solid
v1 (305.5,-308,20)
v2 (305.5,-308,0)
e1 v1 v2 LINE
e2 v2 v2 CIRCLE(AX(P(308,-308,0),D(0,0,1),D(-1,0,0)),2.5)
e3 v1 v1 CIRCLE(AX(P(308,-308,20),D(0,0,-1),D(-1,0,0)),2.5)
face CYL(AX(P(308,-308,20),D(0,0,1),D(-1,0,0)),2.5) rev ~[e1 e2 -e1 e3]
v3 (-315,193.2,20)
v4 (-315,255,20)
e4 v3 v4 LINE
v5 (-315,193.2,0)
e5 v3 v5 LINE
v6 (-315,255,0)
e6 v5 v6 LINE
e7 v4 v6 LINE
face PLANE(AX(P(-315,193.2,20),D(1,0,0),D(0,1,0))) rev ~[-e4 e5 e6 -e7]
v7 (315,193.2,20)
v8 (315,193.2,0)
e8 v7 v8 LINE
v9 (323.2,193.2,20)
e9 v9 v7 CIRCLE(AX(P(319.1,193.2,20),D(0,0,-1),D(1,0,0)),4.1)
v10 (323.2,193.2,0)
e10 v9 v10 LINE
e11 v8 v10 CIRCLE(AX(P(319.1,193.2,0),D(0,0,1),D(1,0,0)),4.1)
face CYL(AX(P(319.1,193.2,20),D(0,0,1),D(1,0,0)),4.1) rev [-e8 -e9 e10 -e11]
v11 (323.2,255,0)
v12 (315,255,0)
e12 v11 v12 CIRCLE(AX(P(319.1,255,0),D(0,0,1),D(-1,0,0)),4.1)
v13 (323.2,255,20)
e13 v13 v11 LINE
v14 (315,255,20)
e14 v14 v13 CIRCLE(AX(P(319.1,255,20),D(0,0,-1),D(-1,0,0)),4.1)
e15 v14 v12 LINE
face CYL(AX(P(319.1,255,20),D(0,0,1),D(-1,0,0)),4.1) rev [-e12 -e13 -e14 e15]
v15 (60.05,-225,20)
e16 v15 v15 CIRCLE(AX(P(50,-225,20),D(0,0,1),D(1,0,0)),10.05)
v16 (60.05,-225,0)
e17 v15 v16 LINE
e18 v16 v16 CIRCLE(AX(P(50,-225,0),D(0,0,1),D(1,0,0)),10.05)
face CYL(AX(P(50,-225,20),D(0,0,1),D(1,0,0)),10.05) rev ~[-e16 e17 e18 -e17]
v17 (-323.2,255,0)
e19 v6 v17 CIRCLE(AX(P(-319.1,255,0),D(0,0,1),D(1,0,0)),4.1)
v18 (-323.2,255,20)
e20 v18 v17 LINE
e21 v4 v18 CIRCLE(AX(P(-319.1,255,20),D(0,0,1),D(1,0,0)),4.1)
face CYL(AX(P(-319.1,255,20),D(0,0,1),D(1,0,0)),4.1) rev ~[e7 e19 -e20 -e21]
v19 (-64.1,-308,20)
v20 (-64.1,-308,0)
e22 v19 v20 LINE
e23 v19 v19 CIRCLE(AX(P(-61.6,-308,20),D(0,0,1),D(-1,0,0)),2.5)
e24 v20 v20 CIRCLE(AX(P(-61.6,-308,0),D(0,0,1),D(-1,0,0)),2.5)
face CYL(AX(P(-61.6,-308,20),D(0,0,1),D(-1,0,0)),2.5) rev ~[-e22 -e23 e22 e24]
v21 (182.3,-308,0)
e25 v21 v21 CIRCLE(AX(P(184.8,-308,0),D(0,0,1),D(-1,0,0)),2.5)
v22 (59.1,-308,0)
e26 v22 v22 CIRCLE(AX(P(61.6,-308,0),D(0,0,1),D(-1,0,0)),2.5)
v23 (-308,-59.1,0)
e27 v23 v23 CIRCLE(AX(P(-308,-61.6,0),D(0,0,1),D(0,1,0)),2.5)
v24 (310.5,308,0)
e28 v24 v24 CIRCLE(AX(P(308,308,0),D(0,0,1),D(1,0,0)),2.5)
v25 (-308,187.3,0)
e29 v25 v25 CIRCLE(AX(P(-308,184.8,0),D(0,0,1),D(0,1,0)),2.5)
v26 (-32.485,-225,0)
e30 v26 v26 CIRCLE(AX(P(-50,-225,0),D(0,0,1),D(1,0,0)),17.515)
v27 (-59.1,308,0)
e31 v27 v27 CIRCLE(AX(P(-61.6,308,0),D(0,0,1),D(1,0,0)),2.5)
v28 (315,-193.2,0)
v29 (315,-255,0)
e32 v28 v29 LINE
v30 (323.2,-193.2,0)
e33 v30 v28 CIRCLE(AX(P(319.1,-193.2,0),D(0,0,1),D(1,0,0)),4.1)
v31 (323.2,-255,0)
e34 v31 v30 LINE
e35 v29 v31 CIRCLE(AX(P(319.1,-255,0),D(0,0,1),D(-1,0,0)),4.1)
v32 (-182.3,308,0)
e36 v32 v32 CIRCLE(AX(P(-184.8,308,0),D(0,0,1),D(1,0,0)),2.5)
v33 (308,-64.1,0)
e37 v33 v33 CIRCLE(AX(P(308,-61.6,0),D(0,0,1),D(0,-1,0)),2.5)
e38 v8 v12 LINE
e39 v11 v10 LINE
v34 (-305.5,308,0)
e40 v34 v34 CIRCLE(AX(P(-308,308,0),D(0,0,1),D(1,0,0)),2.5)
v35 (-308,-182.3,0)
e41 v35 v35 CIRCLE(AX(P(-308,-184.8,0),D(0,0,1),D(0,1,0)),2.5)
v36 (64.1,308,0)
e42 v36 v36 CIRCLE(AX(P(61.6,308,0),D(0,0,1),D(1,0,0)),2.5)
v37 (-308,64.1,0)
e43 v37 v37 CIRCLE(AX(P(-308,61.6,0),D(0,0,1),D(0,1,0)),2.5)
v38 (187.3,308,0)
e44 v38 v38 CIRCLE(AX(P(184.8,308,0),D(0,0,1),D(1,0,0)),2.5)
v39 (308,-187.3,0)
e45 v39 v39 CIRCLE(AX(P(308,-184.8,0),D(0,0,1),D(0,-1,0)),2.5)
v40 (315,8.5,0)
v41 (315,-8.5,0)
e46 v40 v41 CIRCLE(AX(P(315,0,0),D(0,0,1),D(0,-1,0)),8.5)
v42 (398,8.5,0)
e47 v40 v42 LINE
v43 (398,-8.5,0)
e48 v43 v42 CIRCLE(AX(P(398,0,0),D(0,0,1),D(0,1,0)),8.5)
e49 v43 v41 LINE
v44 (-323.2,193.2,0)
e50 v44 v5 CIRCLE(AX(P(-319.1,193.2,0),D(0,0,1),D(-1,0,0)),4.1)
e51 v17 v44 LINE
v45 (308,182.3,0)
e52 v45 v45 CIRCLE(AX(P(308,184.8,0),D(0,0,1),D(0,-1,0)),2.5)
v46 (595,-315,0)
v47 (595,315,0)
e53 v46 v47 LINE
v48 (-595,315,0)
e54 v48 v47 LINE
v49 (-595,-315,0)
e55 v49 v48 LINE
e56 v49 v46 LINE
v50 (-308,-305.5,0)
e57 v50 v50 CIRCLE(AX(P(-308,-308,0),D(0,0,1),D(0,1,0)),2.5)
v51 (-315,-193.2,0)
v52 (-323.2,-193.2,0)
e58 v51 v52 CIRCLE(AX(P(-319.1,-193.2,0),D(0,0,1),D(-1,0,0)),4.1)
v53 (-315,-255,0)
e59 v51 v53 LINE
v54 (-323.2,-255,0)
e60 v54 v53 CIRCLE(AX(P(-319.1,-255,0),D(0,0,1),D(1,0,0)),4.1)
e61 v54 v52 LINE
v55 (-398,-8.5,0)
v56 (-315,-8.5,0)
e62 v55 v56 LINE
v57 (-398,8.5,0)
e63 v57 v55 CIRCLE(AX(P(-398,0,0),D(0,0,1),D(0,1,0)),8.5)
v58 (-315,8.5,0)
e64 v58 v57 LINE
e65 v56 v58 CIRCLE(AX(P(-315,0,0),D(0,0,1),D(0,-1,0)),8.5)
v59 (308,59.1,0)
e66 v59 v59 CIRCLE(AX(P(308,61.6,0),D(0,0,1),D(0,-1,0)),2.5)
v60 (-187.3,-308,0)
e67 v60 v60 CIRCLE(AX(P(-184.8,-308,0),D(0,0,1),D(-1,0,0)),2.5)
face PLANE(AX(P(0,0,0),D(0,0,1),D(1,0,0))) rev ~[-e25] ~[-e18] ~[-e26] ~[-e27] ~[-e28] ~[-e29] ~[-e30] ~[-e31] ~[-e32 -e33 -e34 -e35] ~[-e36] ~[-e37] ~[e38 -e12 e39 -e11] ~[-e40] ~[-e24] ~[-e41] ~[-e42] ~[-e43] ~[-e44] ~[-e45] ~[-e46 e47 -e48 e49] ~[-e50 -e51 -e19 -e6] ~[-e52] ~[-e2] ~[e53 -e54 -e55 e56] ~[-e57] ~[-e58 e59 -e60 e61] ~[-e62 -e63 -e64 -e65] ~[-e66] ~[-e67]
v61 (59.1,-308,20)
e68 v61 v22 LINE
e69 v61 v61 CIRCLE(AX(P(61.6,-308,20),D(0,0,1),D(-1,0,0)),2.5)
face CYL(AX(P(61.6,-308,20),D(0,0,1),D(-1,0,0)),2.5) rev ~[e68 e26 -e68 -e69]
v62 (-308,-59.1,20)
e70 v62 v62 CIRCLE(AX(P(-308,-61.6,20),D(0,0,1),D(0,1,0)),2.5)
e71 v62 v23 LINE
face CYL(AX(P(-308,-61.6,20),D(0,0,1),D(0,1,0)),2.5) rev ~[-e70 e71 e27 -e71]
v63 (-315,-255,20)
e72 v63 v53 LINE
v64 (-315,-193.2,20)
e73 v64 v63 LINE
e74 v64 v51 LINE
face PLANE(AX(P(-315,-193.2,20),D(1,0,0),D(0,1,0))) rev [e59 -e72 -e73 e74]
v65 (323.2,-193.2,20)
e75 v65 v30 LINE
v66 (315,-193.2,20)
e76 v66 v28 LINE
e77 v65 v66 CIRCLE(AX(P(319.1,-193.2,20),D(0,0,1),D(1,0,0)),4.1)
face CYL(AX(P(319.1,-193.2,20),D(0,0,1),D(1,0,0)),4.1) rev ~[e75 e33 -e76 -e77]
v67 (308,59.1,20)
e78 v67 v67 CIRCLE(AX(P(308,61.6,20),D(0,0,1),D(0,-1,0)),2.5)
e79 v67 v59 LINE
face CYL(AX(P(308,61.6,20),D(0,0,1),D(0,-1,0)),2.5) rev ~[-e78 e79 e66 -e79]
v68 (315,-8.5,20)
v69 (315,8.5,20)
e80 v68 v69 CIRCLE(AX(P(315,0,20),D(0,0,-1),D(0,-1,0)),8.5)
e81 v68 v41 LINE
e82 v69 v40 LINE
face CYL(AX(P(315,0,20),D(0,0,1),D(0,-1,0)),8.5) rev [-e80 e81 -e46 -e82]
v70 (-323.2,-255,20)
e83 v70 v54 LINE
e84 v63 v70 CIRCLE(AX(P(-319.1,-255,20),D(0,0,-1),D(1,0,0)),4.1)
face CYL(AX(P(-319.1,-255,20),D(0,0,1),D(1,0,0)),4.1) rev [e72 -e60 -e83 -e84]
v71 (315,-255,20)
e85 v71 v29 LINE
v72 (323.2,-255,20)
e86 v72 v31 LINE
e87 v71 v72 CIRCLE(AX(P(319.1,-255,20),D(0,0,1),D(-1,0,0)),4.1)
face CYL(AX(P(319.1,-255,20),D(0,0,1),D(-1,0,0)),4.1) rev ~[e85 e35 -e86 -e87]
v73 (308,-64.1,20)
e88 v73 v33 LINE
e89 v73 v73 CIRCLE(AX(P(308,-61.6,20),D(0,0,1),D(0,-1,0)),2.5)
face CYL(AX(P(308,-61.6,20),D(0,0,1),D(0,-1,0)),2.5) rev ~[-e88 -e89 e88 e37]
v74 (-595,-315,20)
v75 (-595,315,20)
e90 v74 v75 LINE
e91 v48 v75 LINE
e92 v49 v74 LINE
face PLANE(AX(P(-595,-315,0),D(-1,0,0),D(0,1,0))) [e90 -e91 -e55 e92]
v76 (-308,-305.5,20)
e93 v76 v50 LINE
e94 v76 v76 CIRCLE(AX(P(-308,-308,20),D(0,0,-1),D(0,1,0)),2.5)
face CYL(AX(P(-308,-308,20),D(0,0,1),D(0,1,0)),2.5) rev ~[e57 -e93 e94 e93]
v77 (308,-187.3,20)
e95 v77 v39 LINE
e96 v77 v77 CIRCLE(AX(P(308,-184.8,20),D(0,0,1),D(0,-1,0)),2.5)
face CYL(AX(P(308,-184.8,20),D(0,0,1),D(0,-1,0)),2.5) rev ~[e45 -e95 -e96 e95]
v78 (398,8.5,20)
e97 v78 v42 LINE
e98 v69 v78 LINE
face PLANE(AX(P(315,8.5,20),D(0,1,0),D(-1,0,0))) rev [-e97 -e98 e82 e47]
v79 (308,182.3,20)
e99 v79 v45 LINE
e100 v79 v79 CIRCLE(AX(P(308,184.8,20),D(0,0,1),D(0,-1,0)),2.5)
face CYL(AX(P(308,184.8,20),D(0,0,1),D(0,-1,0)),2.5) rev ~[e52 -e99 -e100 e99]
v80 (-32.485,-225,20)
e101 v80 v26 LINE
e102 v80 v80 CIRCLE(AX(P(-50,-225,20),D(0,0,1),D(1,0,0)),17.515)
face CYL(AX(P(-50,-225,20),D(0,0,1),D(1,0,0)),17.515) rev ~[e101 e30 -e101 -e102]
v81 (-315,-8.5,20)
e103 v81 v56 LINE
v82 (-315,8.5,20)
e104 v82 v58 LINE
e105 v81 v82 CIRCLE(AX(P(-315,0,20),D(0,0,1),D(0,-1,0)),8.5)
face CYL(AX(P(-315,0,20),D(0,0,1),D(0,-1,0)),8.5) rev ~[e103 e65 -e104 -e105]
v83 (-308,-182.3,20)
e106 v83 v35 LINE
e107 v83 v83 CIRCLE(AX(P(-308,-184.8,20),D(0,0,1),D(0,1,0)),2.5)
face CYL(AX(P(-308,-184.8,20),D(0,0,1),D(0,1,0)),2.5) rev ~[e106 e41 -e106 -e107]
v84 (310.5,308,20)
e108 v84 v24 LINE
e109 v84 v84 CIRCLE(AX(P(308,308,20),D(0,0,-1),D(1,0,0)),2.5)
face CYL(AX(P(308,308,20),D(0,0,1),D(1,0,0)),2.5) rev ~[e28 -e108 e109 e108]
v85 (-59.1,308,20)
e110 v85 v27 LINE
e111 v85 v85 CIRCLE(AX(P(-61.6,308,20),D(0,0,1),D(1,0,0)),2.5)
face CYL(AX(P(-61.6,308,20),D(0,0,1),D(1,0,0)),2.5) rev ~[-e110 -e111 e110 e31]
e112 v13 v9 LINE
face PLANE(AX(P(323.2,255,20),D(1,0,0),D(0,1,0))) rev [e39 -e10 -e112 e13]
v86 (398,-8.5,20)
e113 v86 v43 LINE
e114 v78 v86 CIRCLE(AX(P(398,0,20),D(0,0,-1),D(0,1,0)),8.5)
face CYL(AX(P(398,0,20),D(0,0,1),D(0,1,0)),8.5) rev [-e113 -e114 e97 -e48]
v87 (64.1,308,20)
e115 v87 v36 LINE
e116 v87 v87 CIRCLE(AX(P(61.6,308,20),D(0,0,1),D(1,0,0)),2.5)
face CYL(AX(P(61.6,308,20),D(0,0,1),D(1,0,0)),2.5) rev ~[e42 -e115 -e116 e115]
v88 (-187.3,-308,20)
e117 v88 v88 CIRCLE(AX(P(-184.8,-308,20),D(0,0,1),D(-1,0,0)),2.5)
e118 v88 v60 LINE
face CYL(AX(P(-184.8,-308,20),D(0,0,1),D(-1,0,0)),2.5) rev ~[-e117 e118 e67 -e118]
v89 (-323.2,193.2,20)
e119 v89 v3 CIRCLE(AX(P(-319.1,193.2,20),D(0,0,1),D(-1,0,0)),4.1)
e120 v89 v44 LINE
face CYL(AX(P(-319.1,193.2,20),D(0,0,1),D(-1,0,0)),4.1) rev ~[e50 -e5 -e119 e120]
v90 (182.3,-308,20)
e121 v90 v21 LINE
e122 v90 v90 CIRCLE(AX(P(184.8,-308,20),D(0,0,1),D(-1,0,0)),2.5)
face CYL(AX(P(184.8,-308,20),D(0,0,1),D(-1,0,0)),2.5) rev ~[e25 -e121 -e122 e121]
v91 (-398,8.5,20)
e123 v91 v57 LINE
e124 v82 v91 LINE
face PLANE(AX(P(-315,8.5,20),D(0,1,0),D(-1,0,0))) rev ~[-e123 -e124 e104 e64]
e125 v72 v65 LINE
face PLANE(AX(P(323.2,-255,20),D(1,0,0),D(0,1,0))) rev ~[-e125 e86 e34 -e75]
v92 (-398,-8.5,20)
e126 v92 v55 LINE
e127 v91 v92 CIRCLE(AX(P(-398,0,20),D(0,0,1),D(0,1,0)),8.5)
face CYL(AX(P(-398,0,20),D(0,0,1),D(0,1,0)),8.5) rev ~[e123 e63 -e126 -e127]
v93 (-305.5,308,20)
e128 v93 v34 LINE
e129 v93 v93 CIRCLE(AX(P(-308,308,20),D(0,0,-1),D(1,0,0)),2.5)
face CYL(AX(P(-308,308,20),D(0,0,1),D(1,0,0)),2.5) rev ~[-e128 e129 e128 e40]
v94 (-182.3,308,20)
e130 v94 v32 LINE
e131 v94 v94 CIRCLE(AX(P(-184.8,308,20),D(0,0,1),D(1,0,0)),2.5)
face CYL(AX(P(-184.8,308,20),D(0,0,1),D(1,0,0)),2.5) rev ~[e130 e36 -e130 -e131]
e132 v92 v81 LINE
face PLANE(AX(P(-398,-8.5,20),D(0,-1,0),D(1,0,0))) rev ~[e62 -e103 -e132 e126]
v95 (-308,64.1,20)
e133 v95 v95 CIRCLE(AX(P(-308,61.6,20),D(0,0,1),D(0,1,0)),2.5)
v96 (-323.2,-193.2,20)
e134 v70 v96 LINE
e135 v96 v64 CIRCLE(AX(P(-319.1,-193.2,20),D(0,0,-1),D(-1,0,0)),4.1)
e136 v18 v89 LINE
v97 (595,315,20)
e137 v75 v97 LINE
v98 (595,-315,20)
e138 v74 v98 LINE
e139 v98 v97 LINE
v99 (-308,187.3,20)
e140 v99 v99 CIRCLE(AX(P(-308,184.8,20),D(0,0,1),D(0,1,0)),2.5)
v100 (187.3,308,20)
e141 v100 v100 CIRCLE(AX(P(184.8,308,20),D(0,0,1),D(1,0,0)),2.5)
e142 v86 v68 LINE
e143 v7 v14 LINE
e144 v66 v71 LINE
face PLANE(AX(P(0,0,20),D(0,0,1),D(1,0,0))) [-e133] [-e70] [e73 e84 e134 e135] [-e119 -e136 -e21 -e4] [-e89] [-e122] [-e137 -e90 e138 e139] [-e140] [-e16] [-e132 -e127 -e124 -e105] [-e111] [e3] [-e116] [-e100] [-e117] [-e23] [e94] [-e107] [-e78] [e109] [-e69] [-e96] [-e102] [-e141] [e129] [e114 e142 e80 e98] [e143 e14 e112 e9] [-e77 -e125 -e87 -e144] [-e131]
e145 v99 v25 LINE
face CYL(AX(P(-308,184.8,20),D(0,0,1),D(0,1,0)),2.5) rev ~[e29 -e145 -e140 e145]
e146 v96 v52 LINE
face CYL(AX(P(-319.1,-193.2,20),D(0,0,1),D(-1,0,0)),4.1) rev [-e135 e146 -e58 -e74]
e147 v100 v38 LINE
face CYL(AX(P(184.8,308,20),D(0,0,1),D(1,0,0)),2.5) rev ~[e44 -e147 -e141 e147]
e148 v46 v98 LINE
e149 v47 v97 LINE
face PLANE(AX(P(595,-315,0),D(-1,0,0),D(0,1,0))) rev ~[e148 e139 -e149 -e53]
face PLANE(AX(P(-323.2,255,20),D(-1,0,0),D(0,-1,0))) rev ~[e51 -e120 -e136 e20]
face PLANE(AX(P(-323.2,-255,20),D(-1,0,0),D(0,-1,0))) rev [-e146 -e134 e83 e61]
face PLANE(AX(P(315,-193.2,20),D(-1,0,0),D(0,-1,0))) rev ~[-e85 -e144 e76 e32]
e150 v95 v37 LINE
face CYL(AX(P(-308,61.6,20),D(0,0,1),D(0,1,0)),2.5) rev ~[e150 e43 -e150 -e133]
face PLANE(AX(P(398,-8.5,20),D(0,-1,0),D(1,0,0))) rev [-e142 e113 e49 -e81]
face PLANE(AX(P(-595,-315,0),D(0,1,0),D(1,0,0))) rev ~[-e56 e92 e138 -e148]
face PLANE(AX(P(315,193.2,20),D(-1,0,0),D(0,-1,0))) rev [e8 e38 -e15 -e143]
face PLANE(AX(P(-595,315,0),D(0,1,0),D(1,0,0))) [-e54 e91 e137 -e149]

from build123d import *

# Parameters (mm, degrees)
F0_W             = 1190
F0_H             = 630
F1_DEPTH         = 20
F4_DEPTH         = 20.001
F4_COPIES2_COUNT = 2
F4_COPIES2_PITCH = 779.860552
F5_DEPTH         = 20.001
F7_R             = 17.515
F7_R_2           = 10.05
F8_DEPTH         = 20.001
F11_R            = 2.5
F12_DEPTH        = 20.001
F12_COPIES_COUNT = 4
F9_W             = 1190
F9_H             = 242.437693119
F13_DEPTH        = 20.001


# Not quite as in the source:
# - a pattern or mirror of a feature is missing from the dataset's text; its kind, count and spacing are read off the source's solid


with BuildPart() as f1:
    # F0 (on Top) → F1 (new body)
    with BuildSketch(Plane.XY):
        Rectangle(F0_W, F0_H)
    extrude(amount=F1_DEPTH)

    # F3 (on face) → F4 (cut, through all)
    with BuildSketch(Plane.XY.offset(20)):
        with BuildLine():
            Line((-323.2, 255), (-323.2, 193.2))
            ThreePointArc((-323.2, 193.2), (-319.1, 189.1), (-315, 193.2))
            Line((-315, 193.2), (-315, 255))
            ThreePointArc((-315, 255), (-319.1, 259.1), (-323.2, 255))
        make_face()
    f4 = extrude(amount=-F4_DEPTH, mode=Mode.SUBTRACT)

    # F4_copies: F4 across plane
    add(f4.mirror(Plane(origin=(0, 0, 0), x_dir=(0, 0, 1), z_dir=(1, 0, 0))), mode=Mode.SUBTRACT)

    # F4_copies1: F4 across plane
    add(f4.mirror(Plane(origin=(0, 0, 0), x_dir=(0, 0, -1), z_dir=(0, -1, 0))), mode=Mode.SUBTRACT)

    # F4_copies2: F4 ×2
    with Locations(*[Vector(0.818351433, -0.5747181327, 0) * (i * F4_COPIES2_PITCH) for i in range(1, F4_COPIES2_COUNT)]):
        add(f4, mode=Mode.SUBTRACT)

    # F3 (on face) → F5 (cut, through all)
    with BuildSketch(Plane.XY.offset(20)):
        with BuildLine():
            Line((-398, -8.5), (-315, -8.5))
            ThreePointArc((-315, -8.5), (-306.5, 0), (-315, 8.5))
            Line((-315, 8.5), (-398, 8.5))
            ThreePointArc((-398, 8.5), (-406.5, 0), (-398, -8.5))
        make_face()
    f5 = extrude(amount=-F5_DEPTH, mode=Mode.SUBTRACT)

    # F5_copies: F5 across plane
    add(f5.mirror(Plane(origin=(0, 0, 0), x_dir=(0, 0, 1), z_dir=(1, 0, 0))), mode=Mode.SUBTRACT)

    # F7 (on face) → F8 (cut, through all)
    with BuildSketch(Plane.XY.offset(20)):
        with Locations((-50, -225)):
            Circle(F7_R)
        with Locations((50, -225)):
            Circle(F7_R_2)
    extrude(amount=-F8_DEPTH, mode=Mode.SUBTRACT)

    # F11 (on face) → F12 (cut, through all)
    with BuildSketch(Plane.XY.offset(20)):
        with Locations((-308, 308)):
            Circle(F11_R)
        with Locations((-184.8, 308)):
            Circle(F11_R)
        with Locations((-61.6, 308)):
            Circle(F11_R)
        with Locations((61.6, 308)):
            Circle(F11_R)
        with Locations((184.8, 308)):
            Circle(F11_R)
        with Locations((308, 308)):
            Circle(F11_R)
    f12 = extrude(amount=-F12_DEPTH, mode=Mode.SUBTRACT)

    # F12_copies: F12 ×4 about axis
    f12_copies_axis = Axis((0, 0, 0), (0, 0, 1))
    for i in range(1, F12_COPIES_COUNT):
        add(f12.rotate(f12_copies_axis, i * 360 / F12_COPIES_COUNT), mode=Mode.SUBTRACT)

    # F9 (on face) → F13 (cut, through all)
    with BuildSketch(Plane.XY.offset(20)):
        with Locations((0, 436.2188465595)):
            Rectangle(F9_W, F9_H)
    extrude(amount=-F13_DEPTH, mode=Mode.SUBTRACT)


solid = f1.part
